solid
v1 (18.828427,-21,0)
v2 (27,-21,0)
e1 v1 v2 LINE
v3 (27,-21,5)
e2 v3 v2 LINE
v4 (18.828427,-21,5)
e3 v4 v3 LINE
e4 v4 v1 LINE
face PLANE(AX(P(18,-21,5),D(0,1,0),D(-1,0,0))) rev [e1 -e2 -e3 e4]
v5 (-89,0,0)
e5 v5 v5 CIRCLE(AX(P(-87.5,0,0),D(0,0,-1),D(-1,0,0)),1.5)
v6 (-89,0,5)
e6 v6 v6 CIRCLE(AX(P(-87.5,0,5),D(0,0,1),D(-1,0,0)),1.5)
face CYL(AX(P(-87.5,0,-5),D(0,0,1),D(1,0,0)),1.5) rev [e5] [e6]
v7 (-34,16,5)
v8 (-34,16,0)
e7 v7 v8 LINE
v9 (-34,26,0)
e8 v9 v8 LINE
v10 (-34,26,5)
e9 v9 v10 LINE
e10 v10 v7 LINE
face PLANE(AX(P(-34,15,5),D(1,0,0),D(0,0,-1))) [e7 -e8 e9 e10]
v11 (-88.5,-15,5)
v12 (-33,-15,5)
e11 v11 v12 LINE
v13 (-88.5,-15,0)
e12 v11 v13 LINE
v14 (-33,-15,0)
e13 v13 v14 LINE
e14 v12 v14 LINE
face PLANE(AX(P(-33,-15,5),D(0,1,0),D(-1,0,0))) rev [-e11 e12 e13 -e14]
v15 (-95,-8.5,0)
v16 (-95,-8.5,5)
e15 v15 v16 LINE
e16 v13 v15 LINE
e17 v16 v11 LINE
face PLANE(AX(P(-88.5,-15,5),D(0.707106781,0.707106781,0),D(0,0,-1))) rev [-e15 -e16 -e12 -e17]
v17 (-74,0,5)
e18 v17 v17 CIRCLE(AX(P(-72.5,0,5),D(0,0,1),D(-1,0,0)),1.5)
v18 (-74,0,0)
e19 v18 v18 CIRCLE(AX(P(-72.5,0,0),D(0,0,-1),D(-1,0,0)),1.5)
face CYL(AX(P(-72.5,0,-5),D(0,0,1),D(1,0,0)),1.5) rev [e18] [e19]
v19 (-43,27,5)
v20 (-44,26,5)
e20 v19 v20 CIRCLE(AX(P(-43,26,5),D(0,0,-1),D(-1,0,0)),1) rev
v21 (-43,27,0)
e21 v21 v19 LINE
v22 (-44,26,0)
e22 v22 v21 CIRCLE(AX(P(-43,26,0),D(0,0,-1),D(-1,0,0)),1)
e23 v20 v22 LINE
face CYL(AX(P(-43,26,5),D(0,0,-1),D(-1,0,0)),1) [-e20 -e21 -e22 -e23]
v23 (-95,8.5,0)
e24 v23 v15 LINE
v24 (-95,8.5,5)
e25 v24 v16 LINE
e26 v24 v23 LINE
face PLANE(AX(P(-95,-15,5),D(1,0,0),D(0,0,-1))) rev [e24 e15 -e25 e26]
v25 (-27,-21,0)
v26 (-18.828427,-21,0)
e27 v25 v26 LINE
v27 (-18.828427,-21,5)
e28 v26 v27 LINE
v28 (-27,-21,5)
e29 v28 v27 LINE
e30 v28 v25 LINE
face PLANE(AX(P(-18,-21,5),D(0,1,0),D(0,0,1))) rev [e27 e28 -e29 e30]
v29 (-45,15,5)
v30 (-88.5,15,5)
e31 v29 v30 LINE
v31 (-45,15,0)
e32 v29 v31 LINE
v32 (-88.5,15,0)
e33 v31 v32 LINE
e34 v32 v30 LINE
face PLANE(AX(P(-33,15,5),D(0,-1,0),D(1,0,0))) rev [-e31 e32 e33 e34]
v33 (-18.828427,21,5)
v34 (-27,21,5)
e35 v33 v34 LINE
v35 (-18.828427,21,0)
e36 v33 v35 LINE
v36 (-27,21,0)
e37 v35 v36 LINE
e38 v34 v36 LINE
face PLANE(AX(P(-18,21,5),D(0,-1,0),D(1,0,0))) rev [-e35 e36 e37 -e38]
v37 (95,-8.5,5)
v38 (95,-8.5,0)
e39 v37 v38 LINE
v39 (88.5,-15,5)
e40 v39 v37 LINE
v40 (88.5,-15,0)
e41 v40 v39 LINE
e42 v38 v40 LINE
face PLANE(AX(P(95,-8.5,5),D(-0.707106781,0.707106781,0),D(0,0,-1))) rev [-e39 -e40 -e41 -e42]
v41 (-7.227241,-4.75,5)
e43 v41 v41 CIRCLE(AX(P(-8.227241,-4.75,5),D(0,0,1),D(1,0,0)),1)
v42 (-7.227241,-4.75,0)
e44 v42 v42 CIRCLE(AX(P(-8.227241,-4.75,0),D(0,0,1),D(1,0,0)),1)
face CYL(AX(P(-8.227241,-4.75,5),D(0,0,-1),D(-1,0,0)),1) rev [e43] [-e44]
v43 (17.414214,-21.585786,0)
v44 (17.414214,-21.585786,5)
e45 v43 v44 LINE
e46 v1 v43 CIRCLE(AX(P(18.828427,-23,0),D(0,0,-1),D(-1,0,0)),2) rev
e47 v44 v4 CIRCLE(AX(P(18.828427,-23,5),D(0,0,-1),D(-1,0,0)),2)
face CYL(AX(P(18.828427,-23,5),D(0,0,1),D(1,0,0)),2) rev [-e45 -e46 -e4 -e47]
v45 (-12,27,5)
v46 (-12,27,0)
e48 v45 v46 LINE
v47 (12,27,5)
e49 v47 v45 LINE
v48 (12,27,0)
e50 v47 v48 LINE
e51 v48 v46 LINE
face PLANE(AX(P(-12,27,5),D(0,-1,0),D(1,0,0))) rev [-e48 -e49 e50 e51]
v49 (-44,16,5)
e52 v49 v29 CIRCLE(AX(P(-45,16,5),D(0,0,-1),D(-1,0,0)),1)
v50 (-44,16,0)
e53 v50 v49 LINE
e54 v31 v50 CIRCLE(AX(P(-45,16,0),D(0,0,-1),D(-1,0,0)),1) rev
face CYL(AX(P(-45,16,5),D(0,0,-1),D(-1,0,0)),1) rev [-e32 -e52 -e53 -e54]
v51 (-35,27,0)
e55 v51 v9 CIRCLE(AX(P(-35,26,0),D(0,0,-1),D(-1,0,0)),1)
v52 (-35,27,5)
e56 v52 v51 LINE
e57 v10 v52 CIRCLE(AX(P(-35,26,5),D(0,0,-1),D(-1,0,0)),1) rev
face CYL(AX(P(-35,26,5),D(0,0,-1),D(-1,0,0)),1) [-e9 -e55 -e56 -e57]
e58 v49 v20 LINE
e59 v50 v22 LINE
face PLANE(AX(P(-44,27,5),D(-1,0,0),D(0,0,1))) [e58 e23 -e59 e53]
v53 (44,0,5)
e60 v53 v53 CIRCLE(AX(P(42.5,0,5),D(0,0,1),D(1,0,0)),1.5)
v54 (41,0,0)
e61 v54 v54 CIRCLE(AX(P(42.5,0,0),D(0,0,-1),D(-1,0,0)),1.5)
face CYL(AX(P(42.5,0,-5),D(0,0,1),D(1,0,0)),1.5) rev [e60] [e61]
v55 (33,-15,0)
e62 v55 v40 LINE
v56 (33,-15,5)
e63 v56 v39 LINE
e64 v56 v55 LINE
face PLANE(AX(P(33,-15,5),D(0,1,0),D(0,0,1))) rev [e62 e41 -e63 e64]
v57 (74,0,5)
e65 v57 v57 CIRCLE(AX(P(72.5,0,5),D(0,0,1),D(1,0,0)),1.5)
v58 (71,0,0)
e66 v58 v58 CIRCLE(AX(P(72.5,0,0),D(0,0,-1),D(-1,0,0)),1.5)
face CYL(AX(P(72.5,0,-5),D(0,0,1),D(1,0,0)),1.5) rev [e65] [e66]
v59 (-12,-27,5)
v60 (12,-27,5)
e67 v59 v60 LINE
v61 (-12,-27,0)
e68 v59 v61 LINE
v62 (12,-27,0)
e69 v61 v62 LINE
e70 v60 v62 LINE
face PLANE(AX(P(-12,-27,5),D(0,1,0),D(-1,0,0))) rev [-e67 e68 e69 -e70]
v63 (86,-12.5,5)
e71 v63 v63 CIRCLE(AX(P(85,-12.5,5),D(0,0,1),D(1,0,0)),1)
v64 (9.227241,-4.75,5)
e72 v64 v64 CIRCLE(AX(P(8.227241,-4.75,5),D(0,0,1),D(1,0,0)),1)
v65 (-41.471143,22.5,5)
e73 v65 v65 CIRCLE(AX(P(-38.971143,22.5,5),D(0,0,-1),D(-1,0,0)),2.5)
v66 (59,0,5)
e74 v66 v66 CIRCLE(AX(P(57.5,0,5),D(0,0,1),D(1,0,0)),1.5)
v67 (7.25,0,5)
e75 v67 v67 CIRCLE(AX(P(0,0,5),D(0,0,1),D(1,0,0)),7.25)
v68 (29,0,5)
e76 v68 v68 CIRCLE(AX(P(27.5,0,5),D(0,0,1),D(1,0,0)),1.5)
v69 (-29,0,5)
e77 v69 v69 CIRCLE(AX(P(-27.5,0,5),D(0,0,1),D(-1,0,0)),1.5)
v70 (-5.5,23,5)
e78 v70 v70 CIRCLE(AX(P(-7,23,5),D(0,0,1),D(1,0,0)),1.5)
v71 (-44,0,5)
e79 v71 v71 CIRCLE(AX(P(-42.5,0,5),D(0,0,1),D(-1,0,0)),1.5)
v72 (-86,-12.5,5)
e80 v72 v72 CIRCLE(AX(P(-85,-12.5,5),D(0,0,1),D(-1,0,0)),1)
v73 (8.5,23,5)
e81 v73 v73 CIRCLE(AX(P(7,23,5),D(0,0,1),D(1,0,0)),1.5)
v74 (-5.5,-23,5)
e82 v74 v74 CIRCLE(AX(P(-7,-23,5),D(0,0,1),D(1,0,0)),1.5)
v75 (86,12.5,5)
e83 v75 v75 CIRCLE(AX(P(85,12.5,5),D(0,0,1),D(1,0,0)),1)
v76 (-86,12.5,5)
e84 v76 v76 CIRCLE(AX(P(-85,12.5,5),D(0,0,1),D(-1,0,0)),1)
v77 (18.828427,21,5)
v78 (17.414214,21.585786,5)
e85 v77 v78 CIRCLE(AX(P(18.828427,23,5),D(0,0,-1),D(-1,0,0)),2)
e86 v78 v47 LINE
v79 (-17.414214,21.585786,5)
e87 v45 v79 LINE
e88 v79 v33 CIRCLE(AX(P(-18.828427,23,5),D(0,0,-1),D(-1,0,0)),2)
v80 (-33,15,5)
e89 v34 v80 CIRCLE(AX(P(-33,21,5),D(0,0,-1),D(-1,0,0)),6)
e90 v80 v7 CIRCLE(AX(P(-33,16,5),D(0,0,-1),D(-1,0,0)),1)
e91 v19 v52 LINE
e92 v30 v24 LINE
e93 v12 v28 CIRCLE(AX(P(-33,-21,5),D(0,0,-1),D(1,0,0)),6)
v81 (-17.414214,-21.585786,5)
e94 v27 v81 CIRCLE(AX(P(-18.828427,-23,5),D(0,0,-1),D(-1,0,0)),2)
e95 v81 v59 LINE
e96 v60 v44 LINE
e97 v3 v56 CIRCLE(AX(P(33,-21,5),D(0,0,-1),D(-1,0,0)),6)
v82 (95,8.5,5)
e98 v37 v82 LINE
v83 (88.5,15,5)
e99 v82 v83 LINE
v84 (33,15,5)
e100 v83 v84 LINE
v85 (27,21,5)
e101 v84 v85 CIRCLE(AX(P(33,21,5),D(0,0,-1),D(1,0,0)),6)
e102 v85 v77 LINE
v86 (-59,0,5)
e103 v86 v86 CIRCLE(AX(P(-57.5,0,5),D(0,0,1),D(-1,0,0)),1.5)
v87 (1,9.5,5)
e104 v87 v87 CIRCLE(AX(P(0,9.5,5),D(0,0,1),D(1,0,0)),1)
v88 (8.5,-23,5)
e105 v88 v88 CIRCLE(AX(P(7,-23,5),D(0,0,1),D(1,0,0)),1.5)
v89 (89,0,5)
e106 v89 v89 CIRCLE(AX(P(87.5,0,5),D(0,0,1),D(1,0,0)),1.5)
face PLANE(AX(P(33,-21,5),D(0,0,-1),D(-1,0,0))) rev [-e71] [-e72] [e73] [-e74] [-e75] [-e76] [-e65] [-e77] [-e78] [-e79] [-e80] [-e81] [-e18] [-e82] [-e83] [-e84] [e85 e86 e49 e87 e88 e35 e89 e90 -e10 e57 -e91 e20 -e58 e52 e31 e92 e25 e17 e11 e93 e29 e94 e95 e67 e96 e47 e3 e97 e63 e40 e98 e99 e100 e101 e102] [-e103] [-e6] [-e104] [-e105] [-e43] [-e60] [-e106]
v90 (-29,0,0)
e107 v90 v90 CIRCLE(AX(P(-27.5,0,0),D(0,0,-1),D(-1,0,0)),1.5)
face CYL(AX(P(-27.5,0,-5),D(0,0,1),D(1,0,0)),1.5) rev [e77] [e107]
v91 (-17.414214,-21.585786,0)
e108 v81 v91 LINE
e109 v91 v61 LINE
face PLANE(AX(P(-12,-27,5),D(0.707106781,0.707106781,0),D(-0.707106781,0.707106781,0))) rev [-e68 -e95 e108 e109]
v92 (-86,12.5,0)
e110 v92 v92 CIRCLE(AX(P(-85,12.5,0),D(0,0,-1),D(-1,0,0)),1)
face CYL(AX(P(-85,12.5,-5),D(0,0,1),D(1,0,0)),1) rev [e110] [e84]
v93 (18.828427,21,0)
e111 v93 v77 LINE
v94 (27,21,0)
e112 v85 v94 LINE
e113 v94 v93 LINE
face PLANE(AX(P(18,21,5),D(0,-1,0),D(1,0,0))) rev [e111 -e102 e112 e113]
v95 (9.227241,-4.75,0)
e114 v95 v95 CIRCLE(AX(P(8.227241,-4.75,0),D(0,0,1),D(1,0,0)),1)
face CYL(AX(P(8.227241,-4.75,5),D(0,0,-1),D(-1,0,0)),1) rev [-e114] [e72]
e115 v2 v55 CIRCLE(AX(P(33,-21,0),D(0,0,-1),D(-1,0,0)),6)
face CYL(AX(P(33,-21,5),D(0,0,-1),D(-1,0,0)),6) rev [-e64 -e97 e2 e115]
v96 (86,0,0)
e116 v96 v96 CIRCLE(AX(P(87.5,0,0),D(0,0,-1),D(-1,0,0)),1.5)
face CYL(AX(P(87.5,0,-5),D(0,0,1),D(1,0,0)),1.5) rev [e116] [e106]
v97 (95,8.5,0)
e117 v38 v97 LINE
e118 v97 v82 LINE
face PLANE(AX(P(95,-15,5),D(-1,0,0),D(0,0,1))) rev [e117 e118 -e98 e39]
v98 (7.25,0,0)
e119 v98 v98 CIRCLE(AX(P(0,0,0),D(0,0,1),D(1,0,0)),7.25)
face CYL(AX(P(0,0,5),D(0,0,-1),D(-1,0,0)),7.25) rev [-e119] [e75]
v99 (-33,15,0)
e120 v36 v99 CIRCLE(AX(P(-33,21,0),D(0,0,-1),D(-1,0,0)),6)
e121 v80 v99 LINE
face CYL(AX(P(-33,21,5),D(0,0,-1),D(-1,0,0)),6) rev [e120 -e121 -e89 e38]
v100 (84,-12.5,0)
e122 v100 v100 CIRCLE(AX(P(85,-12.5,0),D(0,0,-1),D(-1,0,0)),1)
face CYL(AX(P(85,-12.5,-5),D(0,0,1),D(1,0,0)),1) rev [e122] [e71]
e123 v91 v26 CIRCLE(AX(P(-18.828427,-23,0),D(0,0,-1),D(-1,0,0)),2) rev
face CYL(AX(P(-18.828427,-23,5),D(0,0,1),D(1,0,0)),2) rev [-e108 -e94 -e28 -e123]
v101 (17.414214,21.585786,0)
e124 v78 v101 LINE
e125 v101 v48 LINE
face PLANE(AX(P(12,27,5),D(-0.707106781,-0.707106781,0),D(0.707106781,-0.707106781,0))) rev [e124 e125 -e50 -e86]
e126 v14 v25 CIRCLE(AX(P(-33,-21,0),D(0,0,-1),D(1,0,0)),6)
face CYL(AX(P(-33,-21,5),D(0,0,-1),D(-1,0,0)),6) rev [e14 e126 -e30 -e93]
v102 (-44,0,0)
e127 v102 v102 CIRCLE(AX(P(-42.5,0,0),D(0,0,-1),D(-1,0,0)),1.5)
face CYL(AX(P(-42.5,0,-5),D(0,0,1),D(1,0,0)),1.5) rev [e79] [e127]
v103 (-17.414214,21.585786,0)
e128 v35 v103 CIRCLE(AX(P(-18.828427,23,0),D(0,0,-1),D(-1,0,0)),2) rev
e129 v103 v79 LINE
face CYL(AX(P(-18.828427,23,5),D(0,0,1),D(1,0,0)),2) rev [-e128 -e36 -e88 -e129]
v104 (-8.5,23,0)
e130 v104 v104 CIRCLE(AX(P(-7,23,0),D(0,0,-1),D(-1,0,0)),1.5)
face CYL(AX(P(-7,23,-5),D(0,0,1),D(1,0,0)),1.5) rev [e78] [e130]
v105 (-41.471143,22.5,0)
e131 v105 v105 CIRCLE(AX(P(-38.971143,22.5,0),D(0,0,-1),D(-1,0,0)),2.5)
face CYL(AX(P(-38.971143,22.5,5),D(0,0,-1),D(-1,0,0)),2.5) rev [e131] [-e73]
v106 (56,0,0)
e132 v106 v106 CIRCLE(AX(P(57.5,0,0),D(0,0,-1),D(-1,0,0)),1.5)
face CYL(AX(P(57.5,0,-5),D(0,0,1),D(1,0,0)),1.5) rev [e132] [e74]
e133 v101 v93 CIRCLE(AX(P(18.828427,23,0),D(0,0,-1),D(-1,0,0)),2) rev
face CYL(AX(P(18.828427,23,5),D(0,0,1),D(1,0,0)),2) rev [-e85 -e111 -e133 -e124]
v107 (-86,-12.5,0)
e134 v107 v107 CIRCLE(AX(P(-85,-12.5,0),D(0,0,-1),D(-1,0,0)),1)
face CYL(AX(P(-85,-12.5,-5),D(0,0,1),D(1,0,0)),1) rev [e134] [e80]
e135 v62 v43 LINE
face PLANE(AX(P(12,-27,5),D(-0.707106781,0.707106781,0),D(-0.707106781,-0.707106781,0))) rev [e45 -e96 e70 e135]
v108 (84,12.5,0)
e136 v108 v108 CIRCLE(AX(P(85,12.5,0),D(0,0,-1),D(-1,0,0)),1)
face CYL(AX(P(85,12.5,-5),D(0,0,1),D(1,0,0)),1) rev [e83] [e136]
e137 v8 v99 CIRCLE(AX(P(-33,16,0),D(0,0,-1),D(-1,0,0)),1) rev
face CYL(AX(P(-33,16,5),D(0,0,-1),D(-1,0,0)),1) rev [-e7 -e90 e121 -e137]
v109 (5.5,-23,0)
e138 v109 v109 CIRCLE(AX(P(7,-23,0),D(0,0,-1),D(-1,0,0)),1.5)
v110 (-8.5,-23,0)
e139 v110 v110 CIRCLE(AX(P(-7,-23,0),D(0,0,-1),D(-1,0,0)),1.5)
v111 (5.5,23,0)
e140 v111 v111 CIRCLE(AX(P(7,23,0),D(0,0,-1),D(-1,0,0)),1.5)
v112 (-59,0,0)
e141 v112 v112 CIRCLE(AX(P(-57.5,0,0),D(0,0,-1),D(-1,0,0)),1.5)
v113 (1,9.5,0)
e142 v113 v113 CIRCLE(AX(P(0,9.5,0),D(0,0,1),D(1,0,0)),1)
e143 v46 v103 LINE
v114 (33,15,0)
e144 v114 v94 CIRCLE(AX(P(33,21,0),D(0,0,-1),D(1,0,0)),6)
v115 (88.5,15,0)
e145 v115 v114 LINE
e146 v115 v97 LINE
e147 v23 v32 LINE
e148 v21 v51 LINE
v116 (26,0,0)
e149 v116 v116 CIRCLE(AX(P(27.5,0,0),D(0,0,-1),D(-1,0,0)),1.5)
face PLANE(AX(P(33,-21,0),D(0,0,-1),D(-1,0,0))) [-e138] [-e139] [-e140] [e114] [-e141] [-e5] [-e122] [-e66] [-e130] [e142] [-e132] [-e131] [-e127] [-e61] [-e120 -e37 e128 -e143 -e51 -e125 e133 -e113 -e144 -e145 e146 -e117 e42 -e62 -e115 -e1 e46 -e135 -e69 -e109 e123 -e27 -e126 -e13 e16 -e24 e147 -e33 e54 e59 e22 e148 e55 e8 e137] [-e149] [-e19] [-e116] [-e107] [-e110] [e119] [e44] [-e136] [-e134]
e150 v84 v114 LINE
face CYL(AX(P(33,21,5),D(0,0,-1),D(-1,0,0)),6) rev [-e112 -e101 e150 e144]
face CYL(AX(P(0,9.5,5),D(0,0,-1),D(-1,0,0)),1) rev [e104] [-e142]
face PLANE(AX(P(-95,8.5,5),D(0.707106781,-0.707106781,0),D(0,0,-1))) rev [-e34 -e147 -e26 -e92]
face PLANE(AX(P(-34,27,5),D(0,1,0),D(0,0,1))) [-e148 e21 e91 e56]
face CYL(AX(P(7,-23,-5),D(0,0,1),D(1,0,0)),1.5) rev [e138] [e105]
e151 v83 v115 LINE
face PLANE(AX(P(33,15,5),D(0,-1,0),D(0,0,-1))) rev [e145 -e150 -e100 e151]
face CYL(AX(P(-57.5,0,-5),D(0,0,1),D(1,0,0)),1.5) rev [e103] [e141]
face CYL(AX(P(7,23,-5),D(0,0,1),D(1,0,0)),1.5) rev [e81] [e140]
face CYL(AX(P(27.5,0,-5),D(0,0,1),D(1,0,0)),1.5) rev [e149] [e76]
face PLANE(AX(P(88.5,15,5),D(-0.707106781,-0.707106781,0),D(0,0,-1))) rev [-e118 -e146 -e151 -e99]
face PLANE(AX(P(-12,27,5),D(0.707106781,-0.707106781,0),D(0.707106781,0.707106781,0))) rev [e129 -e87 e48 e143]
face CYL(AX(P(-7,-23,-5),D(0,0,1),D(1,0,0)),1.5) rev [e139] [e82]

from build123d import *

# Parameters (mm, degrees)
SKETCH_1_R          = 1
SKETCH_1_R_2        = 7.25
EXTRUDE_1_DEPTH     = 5
SKETCH_2_R          = 1.5
CUT_EXTRUDE_1_DEPTH = 10
SKETCH_3_R          = 1.5
CUT_EXTRUDE_2_DEPTH = 10
FILLET_1_R          = 2
CHAMFER_1_SIZE      = 6.5
SKETCH_4_R          = 1
CUT_EXTRUDE_3_DEPTH = 10
SKETCH_6_W          = 10
SKETCH_6_H          = 12
SKETCH_6_R          = 2.5
EXTRUDE_2_DEPTH     = 5
FILLET_2_R          = 1


with BuildPart() as part:
    # 草图1 → 凸台-拉伸1 (new body)
    with BuildSketch(Plane.XY):
        with BuildLine():
            Line((95, -15), (95, 15))
            Line((95, 15), (33, 15))
            ThreePointArc((33, 15), (28.757359313, 16.757359313), (27, 21))
            Line((27, 21), (18, 21))
            Line((18, 21), (12, 27))
            Line((12, 27), (-12, 27))
            Line((-12, 27), (-18, 21))
            Line((-18, 21), (-27, 21))
            ThreePointArc((-27, 21), (-28.757359313, 16.757359313), (-33, 15))
            Line((-33, 15), (-95, 15))
            Line((-95, 15), (-95, -15))
            Line((-95, -15), (-33, -15))
            ThreePointArc((-33, -15), (-28.757359313, -16.757359313), (-27, -21))
            Line((-27, -21), (-18, -21))
            Line((-18, -21), (-12, -27))
            Line((-12, -27), (12, -27))
            Line((12, -27), (18, -21))
            Line((18, -21), (27, -21))
            ThreePointArc((27, -21), (28.757359313, -16.757359313), (33, -15))
            Line((33, -15), (95, -15))
        make_face()
        with Locations((0, 9.5)):
            Circle(SKETCH_1_R, mode=Mode.SUBTRACT)
        Circle(SKETCH_1_R_2, mode=Mode.SUBTRACT)
        with Locations((8.227241336, -4.75)):
            Circle(SKETCH_1_R, mode=Mode.SUBTRACT)
        with Locations((-8.227241336, -4.75)):
            Circle(SKETCH_1_R, mode=Mode.SUBTRACT)
    extrude(amount=EXTRUDE_1_DEPTH)

    # 草图2 → 切除-拉伸1 (cut)
    with BuildSketch(Plane.XY.offset(5)):
        with Locations((7, 23)):
            Circle(SKETCH_2_R)
        with Locations((-7, 23)):
            Circle(SKETCH_2_R)
        with Locations((7, -23)):
            Circle(SKETCH_2_R)
        with Locations((-7, -23)):
            Circle(SKETCH_2_R)
    extrude(amount=-CUT_EXTRUDE_1_DEPTH, mode=Mode.SUBTRACT)

    # 草图3 → 切除-拉伸2 (cut)
    with BuildSketch(Plane.XY.offset(5)):
        with Locations((87.5, 0)):
            Circle(SKETCH_3_R)
        with Locations((72.5, 0)):
            Circle(SKETCH_3_R)
        with Locations((57.5, 0)):
            Circle(SKETCH_3_R)
        with Locations(Location((-57.5, 0, 0), (0, 0, 180))):
            Circle(SKETCH_3_R)
        with Locations(Location((-72.5, 0, 0), (0, 0, 180))):
            Circle(SKETCH_3_R)
        with Locations(Location((-87.5, 0, 0), (0, 0, 180))):
            Circle(SKETCH_3_R)
        with Locations((42.5, 0)):
            Circle(SKETCH_3_R)
        with Locations((27.5, 0)):
            Circle(SKETCH_3_R)
        with Locations(Location((-27.5, 0, 0), (0, 0, 180))):
            Circle(SKETCH_3_R)
        with Locations(Location((-42.5, 0, 0), (0, 0, 180))):
            Circle(SKETCH_3_R)
    extrude(amount=-CUT_EXTRUDE_2_DEPTH, mode=Mode.SUBTRACT)

    # 圆角1
    fillet_1_edges = [part.edges().sort_by_distance(p)[0] for p in [
        (18, -21, 2.5),
        (-18, -21, 2.5),
        (-18, 21, 2.5),
        (18, 21, 2.5),
    ]]
    fillet(fillet_1_edges, radius=FILLET_1_R)

    # 倒角1
    chamfer_1_edges = [part.edges().sort_by_distance(p)[0] for p in [
        (95, 15, 2.5),
        (95, -15, 2.5),
        (-95, -15, 2.5),
        (-95, 15, 2.5),
    ]]
    chamfer(chamfer_1_edges, length=CHAMFER_1_SIZE)

    # 草图4 → 切除-拉伸3 (cut)
    with BuildSketch(Plane.XY.offset(5)):
        with Locations((85, 12.5)):
            Circle(SKETCH_4_R)
        with Locations((85, -12.5)):
            Circle(SKETCH_4_R)
        with Locations(Location((-85, -12.5, 0), (0, 0, 180))):
            Circle(SKETCH_4_R)
        with Locations(Location((-85, 12.5, 0), (0, 0, 180))):
            Circle(SKETCH_4_R)
    extrude(amount=-CUT_EXTRUDE_3_DEPTH, mode=Mode.SUBTRACT)

    # 草图6 → 凸台-拉伸2 (add)
    with BuildSketch(Plane(origin=(0, 0, 0), x_dir=(-1, 0, 0), z_dir=(0, 0, -1))):
        with Locations((39, 21)):
            Rectangle(SKETCH_6_W, SKETCH_6_H)
        with Locations((38.97114317, 22.5)):
            Circle(SKETCH_6_R, mode=Mode.SUBTRACT)
    extrude(amount=-EXTRUDE_2_DEPTH)

    # 圆角2
    fillet_2_edges = [part.edges().sort_by_distance(p)[0] for p in [
        (-44, 15, 2.5),
        (-34, 15, 2.5),
    ]]
    fillet(fillet_2_edges, radius=FILLET_2_R - 0.0001)  # a hair under: the kernel refuses the full size
    fillet_2_2_edges = [part.edges().sort_by_distance(p)[0] for p in [
        (-34, 27, 2.5),
        (-44, 27, 2.5),
    ]]
    fillet(fillet_2_2_edges, radius=FILLET_2_R)


solid = part.part
